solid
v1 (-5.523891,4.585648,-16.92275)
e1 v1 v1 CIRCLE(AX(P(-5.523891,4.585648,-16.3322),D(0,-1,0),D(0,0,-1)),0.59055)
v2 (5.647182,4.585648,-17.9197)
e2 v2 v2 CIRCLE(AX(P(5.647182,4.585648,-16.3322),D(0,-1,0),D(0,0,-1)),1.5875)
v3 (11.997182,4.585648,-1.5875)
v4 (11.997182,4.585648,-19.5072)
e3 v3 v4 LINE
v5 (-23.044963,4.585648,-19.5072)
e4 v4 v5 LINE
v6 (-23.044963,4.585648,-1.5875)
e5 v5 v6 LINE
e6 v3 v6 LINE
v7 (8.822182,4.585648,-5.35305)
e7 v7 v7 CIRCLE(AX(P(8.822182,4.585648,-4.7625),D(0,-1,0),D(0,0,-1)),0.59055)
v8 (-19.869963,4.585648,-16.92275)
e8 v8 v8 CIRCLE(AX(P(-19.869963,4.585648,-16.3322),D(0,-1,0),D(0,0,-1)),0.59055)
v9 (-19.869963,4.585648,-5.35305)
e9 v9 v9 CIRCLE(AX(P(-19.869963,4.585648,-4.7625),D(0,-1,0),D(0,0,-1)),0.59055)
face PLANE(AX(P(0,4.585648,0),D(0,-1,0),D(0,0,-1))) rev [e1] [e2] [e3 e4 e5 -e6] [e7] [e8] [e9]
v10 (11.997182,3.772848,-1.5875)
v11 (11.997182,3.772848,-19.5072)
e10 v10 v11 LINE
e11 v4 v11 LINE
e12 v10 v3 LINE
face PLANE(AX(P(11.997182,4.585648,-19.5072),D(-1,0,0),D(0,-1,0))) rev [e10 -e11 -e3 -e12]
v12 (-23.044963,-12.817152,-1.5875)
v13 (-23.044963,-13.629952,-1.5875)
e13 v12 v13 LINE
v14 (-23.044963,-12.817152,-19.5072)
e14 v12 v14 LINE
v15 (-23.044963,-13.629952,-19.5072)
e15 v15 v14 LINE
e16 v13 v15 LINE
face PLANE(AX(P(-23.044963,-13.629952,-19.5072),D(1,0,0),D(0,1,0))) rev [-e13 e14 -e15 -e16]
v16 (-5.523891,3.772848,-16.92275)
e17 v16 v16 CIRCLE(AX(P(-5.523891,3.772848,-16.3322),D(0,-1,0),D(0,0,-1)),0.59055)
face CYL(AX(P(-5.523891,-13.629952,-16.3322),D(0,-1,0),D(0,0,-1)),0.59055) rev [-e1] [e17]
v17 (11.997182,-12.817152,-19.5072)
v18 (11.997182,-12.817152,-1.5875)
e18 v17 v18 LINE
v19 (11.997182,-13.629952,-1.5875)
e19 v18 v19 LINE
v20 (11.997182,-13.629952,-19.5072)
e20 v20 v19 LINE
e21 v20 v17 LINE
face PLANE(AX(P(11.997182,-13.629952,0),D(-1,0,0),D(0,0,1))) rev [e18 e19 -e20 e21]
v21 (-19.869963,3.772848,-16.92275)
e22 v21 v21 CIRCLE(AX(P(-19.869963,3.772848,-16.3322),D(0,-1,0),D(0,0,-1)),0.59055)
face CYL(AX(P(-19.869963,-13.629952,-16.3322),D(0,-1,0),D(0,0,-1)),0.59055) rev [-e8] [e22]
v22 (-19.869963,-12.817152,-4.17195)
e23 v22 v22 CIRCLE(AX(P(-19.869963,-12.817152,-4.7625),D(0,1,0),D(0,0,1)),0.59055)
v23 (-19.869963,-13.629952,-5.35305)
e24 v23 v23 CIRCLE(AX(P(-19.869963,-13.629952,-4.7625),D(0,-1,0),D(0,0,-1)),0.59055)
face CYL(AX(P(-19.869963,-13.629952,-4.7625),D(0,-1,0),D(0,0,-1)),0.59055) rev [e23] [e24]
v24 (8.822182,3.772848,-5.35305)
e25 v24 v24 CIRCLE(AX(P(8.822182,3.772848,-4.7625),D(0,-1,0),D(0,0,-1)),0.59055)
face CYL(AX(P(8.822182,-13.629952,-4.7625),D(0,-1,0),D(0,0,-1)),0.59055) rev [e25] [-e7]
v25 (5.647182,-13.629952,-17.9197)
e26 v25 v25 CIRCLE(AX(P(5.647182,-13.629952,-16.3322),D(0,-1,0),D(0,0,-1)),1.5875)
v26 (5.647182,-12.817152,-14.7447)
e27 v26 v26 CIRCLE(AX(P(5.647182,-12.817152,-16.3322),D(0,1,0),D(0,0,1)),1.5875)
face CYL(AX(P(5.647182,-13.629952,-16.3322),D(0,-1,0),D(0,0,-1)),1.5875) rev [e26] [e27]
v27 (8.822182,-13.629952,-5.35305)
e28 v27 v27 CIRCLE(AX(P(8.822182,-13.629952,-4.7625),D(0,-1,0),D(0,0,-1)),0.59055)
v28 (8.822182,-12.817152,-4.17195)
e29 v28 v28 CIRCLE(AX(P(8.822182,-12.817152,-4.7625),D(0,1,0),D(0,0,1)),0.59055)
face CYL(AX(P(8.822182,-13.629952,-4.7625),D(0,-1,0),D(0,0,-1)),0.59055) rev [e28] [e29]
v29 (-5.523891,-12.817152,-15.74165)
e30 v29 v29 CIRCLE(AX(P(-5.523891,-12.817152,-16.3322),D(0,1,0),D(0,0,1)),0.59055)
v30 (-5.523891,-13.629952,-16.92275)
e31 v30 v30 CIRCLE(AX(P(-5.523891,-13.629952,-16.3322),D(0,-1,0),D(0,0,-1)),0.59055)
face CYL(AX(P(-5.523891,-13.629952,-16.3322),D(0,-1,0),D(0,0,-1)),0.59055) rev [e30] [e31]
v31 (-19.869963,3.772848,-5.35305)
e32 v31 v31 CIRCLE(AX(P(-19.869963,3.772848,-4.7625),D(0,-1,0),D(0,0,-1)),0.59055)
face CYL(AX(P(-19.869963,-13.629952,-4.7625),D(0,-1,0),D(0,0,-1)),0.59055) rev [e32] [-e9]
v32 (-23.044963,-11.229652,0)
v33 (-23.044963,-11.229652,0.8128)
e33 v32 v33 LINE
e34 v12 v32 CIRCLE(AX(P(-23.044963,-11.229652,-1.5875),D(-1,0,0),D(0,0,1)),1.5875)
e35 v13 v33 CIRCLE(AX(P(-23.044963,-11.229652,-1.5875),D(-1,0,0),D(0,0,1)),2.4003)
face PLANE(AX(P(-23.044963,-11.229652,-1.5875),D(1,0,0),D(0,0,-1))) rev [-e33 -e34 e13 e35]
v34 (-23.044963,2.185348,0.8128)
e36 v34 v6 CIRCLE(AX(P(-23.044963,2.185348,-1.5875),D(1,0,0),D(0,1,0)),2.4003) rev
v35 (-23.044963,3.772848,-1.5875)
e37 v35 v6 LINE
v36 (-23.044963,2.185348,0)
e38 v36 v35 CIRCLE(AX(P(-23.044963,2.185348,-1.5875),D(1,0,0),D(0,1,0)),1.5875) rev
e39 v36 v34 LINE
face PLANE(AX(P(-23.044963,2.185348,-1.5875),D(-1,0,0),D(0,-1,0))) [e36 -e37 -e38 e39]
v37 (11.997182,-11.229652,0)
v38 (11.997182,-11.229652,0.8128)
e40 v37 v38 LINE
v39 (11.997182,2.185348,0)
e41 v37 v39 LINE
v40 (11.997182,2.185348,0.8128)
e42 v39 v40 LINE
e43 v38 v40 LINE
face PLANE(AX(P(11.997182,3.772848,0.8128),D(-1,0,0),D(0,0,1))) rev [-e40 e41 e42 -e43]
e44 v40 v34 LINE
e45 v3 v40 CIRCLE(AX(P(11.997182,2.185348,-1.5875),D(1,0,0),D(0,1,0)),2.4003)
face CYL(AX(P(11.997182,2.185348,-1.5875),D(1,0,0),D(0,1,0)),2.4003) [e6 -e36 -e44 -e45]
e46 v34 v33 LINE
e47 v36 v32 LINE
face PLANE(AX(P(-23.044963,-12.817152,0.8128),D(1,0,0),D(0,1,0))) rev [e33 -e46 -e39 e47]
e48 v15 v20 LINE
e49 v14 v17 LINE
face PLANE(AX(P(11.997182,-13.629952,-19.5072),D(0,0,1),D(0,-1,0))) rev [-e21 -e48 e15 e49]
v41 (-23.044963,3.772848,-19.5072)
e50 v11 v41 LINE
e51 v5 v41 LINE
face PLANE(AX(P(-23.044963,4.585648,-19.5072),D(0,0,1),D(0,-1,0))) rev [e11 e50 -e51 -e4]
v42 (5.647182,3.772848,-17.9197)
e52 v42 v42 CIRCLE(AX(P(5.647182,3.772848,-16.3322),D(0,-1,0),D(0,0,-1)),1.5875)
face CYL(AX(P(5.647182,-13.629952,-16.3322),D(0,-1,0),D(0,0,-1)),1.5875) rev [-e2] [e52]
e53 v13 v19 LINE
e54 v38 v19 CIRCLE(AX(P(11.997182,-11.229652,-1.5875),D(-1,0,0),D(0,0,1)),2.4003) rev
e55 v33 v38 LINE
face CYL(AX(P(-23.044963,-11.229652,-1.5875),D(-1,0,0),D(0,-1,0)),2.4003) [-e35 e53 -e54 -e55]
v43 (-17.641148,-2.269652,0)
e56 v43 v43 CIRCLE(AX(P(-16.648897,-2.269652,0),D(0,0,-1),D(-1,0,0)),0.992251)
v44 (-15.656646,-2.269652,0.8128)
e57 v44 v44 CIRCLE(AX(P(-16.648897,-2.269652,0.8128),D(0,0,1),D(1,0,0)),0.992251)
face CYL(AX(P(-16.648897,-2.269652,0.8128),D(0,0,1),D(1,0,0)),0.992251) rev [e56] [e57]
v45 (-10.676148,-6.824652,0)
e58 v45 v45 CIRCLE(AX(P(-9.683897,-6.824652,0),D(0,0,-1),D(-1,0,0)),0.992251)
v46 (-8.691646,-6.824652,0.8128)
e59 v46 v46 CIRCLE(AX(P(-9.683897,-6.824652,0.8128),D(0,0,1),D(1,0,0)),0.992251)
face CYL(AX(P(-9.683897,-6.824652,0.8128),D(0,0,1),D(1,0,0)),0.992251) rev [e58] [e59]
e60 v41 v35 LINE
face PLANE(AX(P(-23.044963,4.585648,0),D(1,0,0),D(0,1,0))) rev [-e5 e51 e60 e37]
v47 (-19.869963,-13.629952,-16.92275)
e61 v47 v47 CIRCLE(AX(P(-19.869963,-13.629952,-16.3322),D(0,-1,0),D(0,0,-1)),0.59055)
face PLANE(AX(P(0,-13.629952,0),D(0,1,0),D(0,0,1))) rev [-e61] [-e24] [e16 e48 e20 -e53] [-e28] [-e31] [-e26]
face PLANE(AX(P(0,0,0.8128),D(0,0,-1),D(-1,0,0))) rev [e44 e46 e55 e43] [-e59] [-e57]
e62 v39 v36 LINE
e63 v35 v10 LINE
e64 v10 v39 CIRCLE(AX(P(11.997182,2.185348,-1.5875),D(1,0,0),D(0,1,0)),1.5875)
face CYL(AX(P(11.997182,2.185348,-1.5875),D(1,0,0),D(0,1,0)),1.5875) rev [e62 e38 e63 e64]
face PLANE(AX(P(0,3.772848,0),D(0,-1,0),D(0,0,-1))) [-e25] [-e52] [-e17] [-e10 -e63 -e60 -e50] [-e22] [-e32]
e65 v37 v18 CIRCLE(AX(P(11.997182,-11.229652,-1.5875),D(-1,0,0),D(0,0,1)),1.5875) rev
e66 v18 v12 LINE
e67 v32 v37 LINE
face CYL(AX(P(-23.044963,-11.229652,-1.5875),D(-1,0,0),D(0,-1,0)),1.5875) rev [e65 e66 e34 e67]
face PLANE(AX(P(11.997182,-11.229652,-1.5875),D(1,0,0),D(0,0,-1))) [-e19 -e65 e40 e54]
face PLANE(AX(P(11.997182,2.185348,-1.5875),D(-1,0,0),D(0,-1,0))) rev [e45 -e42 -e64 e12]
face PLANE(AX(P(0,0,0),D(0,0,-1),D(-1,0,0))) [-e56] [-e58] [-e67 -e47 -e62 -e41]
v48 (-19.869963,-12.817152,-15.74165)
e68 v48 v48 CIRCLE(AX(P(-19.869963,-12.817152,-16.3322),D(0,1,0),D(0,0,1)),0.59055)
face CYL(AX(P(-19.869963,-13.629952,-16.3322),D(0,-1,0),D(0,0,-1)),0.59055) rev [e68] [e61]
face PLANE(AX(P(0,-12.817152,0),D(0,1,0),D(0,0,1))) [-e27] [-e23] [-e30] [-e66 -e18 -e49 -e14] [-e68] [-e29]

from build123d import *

# Parameters (mm, degrees)
BASE_FLANGE1_DEPTH              = 0.8128
EDGE_FLANGE1_STRIP_W            = 6.4262
EDGE_FLANGE1_STRIP_H            = 0.8128
EDGE_FLANGE1_STRIP_CUT_DEPTH    = 35.042145822
EDGE_FLANGE1_STRIP_2_W          = 6.4262
EDGE_FLANGE1_STRIP_2_H          = 0.8128
EDGE_FLANGE1_STRIP_CUT_2_DEPTH  = 35.042145822
EDGE_FLANGE1_DEPTH              = 35.042145822
EDGE_FLANGE1_BEND_DEPTH         = 35.042145822
F_1_8_0_125_DIAMETER_HOLE1_D    = 3.175
F_56_0_0465_DIAMETER_HOLE1_D    = 1.1811
F_5_64_0_07813_DIAMETER_HOLE1_D = 1.984502


# Sheet-metal steps are written as plain solids
with BuildPart() as part:
    # Sketch1 → Base-Flange1 (new body)
    with BuildSketch(Plane.XY):
        Polygon((-23.044963434, -12.817151558), (5.647182388, -12.817151558), (11.997182388, -12.817151558), (11.997182388, 3.772848442), (5.647182388, 3.772848442), (-23.044963434, 3.772848442), align=None)
    extrude(amount=BASE_FLANGE1_DEPTH)

    # Edge-Flange1 strip (across the edge) → Edge-Flange1 strip cut (cut)
    with BuildSketch(Plane(origin=(-23.044963434, 3.772848442, 0), x_dir=(0, -1, 0), z_dir=(1, 0, 0))):
        with Locations((-1.6256, -0.4064)):
            Rectangle(EDGE_FLANGE1_STRIP_W, EDGE_FLANGE1_STRIP_H)
    extrude(amount=EDGE_FLANGE1_STRIP_CUT_DEPTH, mode=Mode.SUBTRACT)

    # Edge-Flange1 strip 2 (across the edge) → Edge-Flange1 strip cut 2 (cut)
    with BuildSketch(Plane(origin=(11.997182388, -12.817151558, 0), x_dir=(0, 1, 0), z_dir=(-1, 0, 0))):
        with Locations((-1.6256, -0.4064)):
            Rectangle(EDGE_FLANGE1_STRIP_2_W, EDGE_FLANGE1_STRIP_2_H)
    extrude(amount=EDGE_FLANGE1_STRIP_CUT_2_DEPTH, mode=Mode.SUBTRACT)

    # Edge-Flange1 section (across the edge) → Edge-Flange1 (add)
    with BuildSketch(Plane(origin=(-23.044963434, 3.772848442, 0), x_dir=(0, -1, 0), z_dir=(1, 0, 0))):
        with BuildLine():
            Line((-0.8128, 1.5875), (-0.8128, 19.5072))
            Line((-0.8128, 19.5072), (0, 19.5072))
            Line((0, 19.5072), (0, 1.5875))
            ThreePointArc((0, 1.5875), (0.464967985, 0.464967985), (1.5875, 0))
            Line((1.5875, 0), (1.5875, -0.8128))
            ThreePointArc((1.5875, -0.8128), (-0.109768407, -0.109768407), (-0.8128, 1.5875))
        make_face()
    extrude(amount=EDGE_FLANGE1_DEPTH)

    # Edge-Flange1 section 2 (across the edge) → Edge-Flange1 bend (add)
    with BuildSketch(Plane(origin=(11.997182388, -12.817151558, 0), x_dir=(0, 1, 0), z_dir=(-1, 0, 0))):
        with BuildLine():
            Line((-0.8128, 1.5875), (-0.8128, 19.5072))
            Line((-0.8128, 19.5072), (0, 19.5072))
            Line((0, 19.5072), (0, 1.5875))
            ThreePointArc((0, 1.5875), (0.464967985, 0.464967985), (1.5875, 0))
            Line((1.5875, 0), (1.5875, -0.8128))
            ThreePointArc((1.5875, -0.8128), (-0.109768407, -0.109768407), (-0.8128, 1.5875))
        make_face()
    extrude(amount=EDGE_FLANGE1_BEND_DEPTH)

    # 1/8 (0.125) Diameter Hole1 (through all)
    with Locations(Plane(origin=(0, -13.629951558, 0), x_dir=(-1, 0, 0), z_dir=(0, -1, 0))):
        with Locations((-5.647182388, 16.3322)):
            Hole(F_1_8_0_125_DIAMETER_HOLE1_D / 2)

    # #56 (0.0465) Diameter Hole1 (through all)
    with Locations(Plane(origin=(0, -13.629951558, 0), x_dir=(-1, 0, 0), z_dir=(0, -1, 0))):
        with Locations((5.523890523, 16.3322), (19.869963434, 16.3322), (19.869963434, 4.7625), (-8.822182388, 4.7625)):
            Hole(F_56_0_0465_DIAMETER_HOLE1_D / 2)

    # 5/64 (0.07813) Diameter Hole1 (through all)
    with Locations(Plane.XY.offset(0.8128)):
        with Locations((-16.648897162, -2.269651558), (-9.683897162, -6.824651558)):
            Hole(F_5_64_0_07813_DIAMETER_HOLE1_D / 2)


solid = part.part
